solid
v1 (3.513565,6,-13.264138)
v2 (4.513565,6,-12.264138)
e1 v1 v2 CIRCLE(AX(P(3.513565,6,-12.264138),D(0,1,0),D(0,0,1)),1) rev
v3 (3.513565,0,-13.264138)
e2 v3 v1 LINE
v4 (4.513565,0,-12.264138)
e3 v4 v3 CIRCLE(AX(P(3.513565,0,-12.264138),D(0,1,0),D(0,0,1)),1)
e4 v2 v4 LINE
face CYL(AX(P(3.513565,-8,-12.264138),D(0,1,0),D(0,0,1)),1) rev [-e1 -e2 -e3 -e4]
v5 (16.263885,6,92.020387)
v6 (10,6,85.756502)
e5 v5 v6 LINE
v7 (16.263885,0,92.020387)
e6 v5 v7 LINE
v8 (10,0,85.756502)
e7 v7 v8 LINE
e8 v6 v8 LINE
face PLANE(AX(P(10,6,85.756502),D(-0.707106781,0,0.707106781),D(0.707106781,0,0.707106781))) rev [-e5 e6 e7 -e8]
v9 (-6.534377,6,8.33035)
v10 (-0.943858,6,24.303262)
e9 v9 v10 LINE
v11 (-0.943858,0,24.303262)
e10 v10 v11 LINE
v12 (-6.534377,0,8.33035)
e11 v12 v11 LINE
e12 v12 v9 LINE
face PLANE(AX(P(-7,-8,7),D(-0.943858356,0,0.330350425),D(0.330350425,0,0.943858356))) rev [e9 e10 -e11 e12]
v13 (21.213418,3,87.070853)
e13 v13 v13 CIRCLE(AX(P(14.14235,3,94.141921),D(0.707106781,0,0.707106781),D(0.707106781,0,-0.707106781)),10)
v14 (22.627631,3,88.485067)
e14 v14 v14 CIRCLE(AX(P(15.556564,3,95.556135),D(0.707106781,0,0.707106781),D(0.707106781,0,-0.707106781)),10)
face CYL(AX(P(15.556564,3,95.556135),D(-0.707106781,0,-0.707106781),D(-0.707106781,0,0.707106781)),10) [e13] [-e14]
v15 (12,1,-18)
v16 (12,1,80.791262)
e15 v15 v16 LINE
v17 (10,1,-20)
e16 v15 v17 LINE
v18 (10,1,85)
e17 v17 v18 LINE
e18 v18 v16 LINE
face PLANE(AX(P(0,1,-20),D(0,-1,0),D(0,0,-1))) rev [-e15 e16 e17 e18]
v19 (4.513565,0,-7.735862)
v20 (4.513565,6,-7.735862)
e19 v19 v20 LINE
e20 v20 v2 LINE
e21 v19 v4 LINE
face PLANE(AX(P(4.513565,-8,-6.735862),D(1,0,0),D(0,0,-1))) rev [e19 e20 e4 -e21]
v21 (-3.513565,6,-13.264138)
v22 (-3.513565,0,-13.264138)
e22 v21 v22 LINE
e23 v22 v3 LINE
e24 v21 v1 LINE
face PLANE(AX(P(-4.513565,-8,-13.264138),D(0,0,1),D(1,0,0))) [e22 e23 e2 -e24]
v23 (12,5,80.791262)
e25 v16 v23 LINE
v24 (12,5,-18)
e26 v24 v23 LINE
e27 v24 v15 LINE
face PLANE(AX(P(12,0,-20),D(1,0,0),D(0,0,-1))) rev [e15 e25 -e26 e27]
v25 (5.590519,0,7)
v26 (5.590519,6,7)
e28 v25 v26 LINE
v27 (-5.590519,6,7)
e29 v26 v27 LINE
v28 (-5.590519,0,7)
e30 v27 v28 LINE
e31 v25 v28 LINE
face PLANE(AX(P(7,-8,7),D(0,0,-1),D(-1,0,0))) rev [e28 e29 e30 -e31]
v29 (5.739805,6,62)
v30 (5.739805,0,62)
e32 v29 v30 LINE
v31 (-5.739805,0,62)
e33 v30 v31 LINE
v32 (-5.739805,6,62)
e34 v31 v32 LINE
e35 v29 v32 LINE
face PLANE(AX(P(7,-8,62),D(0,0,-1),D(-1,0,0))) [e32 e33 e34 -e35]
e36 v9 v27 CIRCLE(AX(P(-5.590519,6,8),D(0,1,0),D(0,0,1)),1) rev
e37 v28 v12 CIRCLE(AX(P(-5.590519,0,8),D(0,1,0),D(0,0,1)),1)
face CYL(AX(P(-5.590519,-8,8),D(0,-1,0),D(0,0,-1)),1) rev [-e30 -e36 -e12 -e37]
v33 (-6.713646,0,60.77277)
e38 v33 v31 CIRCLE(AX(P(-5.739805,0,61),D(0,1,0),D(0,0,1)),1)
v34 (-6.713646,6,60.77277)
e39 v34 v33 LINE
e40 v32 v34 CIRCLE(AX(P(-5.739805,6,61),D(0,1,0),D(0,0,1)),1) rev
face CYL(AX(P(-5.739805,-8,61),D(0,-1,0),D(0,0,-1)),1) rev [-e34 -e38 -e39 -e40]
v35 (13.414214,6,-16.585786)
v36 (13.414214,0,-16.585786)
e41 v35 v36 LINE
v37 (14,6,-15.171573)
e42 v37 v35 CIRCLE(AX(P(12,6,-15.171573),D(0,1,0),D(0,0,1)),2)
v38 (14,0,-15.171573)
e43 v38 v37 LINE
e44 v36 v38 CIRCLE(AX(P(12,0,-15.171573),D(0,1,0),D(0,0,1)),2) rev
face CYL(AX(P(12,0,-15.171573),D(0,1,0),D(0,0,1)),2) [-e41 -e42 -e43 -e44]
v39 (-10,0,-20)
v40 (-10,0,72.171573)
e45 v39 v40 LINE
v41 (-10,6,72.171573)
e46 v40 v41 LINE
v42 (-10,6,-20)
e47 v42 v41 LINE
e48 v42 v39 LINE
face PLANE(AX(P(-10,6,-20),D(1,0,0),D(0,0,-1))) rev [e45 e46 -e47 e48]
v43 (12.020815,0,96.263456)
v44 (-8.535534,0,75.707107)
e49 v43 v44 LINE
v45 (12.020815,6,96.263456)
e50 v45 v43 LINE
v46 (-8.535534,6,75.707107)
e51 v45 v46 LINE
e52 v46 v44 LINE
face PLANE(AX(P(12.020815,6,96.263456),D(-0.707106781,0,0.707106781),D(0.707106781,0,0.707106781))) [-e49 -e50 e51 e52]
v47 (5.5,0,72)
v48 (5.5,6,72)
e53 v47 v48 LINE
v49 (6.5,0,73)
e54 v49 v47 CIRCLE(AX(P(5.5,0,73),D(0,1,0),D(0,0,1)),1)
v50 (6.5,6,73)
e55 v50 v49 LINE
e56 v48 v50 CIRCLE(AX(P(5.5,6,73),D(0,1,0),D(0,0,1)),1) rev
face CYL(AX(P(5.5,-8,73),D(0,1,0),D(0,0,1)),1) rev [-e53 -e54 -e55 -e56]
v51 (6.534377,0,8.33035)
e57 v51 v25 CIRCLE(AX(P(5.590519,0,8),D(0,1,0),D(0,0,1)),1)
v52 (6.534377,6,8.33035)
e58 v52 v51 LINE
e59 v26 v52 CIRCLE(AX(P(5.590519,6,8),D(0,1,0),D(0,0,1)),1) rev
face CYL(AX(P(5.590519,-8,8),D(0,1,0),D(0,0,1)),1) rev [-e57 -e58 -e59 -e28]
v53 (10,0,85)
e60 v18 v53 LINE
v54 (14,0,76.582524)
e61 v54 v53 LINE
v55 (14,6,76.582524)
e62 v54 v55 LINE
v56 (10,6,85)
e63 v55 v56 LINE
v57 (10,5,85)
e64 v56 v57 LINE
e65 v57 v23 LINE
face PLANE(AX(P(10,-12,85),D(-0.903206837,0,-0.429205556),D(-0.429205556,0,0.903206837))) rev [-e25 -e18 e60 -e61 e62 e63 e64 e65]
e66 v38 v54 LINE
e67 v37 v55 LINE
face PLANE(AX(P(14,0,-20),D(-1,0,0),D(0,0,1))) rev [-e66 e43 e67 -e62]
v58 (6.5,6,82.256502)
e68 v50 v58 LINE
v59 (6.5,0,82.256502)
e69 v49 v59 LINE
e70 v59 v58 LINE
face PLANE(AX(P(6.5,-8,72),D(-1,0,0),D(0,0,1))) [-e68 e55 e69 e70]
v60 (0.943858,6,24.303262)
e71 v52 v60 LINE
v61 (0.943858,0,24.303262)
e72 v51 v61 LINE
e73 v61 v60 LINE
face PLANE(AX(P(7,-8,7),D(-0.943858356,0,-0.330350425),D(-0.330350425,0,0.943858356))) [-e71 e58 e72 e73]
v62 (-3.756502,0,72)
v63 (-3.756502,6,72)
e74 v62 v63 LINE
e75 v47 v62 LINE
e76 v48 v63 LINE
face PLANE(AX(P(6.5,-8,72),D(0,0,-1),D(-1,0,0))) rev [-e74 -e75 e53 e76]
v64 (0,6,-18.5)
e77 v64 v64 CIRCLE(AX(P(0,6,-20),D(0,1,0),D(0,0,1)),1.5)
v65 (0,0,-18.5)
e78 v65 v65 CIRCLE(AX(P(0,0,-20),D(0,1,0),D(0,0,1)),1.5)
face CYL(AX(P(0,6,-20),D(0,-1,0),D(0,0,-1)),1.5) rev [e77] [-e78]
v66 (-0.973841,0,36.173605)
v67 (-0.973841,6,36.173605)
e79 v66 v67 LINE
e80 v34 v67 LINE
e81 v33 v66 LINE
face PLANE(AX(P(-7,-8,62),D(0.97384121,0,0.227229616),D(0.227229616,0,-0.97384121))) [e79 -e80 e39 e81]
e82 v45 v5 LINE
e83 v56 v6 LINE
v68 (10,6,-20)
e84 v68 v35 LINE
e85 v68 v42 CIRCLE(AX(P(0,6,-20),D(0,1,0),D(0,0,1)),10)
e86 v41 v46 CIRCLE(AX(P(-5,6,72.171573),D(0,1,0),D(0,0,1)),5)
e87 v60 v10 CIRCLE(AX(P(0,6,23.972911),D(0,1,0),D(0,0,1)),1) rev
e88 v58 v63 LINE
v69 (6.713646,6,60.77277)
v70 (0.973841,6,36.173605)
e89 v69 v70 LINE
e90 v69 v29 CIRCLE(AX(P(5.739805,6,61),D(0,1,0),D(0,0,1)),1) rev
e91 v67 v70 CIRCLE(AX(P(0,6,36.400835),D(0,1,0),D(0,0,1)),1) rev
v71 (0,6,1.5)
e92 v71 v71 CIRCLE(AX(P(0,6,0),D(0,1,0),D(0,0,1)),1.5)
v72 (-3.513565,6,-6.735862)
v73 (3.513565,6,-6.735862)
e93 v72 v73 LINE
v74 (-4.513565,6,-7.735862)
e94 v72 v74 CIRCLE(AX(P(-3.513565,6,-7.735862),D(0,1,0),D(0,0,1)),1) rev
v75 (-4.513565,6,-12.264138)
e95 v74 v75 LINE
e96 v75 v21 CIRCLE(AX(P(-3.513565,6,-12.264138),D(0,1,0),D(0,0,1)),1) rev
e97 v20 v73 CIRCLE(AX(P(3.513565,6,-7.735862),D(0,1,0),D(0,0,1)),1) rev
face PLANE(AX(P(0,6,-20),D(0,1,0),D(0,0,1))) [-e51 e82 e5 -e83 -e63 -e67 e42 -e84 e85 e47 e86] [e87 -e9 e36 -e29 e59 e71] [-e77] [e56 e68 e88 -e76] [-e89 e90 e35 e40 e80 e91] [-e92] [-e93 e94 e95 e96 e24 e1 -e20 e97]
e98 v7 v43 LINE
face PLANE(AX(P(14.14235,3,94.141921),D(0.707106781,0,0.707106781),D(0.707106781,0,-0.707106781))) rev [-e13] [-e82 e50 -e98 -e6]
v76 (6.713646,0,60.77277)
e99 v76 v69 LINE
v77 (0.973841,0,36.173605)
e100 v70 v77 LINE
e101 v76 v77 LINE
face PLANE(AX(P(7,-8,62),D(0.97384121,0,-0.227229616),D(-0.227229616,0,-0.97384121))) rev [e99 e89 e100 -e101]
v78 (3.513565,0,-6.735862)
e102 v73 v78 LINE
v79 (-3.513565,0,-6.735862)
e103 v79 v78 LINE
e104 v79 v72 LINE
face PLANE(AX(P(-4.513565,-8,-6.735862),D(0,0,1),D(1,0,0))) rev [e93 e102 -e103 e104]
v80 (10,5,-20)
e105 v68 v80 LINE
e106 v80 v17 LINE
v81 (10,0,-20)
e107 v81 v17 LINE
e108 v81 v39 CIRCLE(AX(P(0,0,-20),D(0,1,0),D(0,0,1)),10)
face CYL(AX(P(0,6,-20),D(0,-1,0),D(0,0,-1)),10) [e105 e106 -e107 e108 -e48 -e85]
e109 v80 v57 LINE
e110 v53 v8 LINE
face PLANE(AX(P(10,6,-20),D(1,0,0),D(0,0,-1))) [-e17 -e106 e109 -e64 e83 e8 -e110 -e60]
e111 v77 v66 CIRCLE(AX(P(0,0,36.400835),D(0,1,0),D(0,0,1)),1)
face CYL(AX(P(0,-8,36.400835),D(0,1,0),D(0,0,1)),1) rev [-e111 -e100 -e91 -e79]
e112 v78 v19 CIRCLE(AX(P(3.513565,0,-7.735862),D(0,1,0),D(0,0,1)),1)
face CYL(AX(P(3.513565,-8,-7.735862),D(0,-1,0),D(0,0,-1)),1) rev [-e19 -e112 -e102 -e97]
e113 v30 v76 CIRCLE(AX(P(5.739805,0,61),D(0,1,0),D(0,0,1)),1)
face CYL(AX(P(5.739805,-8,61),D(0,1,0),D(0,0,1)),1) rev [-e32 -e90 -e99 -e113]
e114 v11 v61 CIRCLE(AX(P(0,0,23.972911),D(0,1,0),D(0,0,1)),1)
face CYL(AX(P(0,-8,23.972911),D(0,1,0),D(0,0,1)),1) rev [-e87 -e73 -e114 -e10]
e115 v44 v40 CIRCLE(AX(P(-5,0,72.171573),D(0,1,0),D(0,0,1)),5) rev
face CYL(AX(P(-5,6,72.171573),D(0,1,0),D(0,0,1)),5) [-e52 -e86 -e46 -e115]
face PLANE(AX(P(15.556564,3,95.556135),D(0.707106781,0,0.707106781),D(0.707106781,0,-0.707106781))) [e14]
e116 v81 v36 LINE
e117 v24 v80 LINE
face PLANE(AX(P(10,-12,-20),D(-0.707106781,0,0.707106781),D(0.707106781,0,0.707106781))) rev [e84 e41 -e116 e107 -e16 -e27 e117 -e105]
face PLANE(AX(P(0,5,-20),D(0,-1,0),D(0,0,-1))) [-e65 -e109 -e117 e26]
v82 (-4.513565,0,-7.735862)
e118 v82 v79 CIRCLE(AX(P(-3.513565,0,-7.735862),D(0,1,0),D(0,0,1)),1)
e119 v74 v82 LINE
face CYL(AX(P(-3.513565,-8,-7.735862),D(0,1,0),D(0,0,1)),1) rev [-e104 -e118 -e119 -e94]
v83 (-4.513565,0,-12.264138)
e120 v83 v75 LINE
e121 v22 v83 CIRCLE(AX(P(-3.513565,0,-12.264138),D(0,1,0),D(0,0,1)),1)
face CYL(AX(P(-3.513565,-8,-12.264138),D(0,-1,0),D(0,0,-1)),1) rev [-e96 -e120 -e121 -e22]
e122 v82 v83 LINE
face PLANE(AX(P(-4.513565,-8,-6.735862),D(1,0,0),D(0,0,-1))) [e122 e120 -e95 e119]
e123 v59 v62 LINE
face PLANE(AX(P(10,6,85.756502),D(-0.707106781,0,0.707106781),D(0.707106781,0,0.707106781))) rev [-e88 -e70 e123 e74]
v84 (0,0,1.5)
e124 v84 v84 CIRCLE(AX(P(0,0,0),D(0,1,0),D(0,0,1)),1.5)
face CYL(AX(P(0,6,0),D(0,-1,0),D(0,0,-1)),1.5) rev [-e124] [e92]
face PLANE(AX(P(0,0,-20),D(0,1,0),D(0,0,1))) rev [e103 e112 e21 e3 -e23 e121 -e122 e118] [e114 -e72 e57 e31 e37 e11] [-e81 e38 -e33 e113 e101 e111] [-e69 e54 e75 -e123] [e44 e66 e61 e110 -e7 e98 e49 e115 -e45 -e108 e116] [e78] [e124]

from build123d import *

# Parameters (mm, degrees)
SKETCH1_R               = 1.5
BOSS_EXTRUDE1_DEPTH     = 6
SKETCH3_W               = 13
SKETCH3_H               = 23
SKETCH3_W_2             = 9.027129354
SKETCH3_H_2             = 6.528275522
CUT_EXTRUDE1_DEPTH      = 14
FILLET1_R               = 1
BOSS_EXTRUDE4_DEPTH     = 120
SKETCH7_W               = 4
SKETCH7_H               = 6
CUT_EXTRUDE5_DEPTH      = 15
SKETCH8_R               = 10
BOSS_EXTRUDE5_DEPTH     = 2
CUT_EXTRUDE6_DEPTH      = 18
FILLET4_R               = 2
FILLET5_R               = 5
CUT_EXTRUDE8_DEPTH      = 20
CUT_EXTRUDE8_DEPTH_BACK = 20
CUT_EXTRUDE9_DEPTH      = 20
CUT_EXTRUDE9_DEPTH_BACK = 20
BOSS_EXTRUDE9_DEPTH     = 6
SKETCH16_R              = 10
BOSS_EXTRUDE10_DEPTH    = 2
FILLET6_R               = 5


with BuildPart() as part:
    # Sketch1 → Boss-Extrude1 (new body)
    with BuildSketch(Plane(origin=(0, 0, 0), x_dir=(1, 0, 0), z_dir=(0, 1, 0))):
        with BuildLine():
            Line((-10, 20), (-10, -100))
            Line((-10, -100), (10, -100))
            Line((10, -100), (10, 20))
            ThreePointArc((10, 20), (0, 30), (-10, 20))
        make_face()
        with Locations(Location((0, 0, 0), (0, 0, 270))):
            Circle(SKETCH1_R, mode=Mode.SUBTRACT)
        with Locations(Location((0, 20, 0), (0, 0, 270))):
            Circle(SKETCH1_R, mode=Mode.SUBTRACT)
    extrude(amount=BOSS_EXTRUDE1_DEPTH)

    # Sketch3 → Cut-Extrude1 (cut)
    with BuildSketch(Plane(origin=(0, 6, 0), x_dir=(1, 0, 0), z_dir=(0, 1, 0))):
        Polygon((7, -7), (-7, -7), (0, -27), align=None)
        Polygon((7, -62), (-7, -62), (0, -32), align=None)
        with Locations((0, -83.5)):
            Rectangle(SKETCH3_W, SKETCH3_H)
        with Locations((0, 10)):
            Rectangle(SKETCH3_W_2, SKETCH3_H_2)
    extrude(amount=-CUT_EXTRUDE1_DEPTH, mode=Mode.SUBTRACT)

    # Fillet1
    fillet1_edges = [part.edges().sort_by_distance(p)[0] for p in [
        (-6.5, 3, 95),
        (-6.5, 3, 72),
        (6.5, 3, 72),
        (6.5, 3, 95),
        (0, 3, 32),
        (7, 3, 62),
        (-7, 3, 62),
        (-7, 3, 7),
        (7, 3, 7),
        (0, 3, 27),
        (-4.513564677, 3, -13.264137761),
        (4.513564677, 3, -13.264137761),
        (4.513564677, 3, -6.735862239),
        (-4.513564677, 3, -6.735862239),
    ]]
    fillet(fillet1_edges, radius=FILLET1_R)

    # Sketch6 → Boss-Extrude4 (add)
    with BuildSketch(Plane.XY.offset(100)):
        Polygon((14, 6), (10, 6), (10, 5), (12, 5), (12, 1), (10, 1), (10, 0), (14, 0), align=None)
    extrude(amount=-BOSS_EXTRUDE4_DEPTH)

    # Sketch7 → Cut-Extrude5 (cut)
    with BuildSketch(Plane.XY.offset(100)):
        with Locations((12, 3)):
            Rectangle(SKETCH7_W, SKETCH7_H)
    extrude(amount=-CUT_EXTRUDE5_DEPTH, mode=Mode.SUBTRACT)

    # Sketch8 → Boss-Extrude5 (add)
    with BuildSketch(Plane.XY.offset(100)):
        with Locations((0, 3)):
            Circle(SKETCH8_R)
    extrude(amount=BOSS_EXTRUDE5_DEPTH)

    # Sketch9 → Cut-Extrude6 (cut)
    with BuildSketch(Plane(origin=(0, 6, 0), x_dir=(1, 0, 0), z_dir=(0, 1, 0))):
        Polygon((10, 20), (14, 16), (14, 20), align=None)
        Polygon((10, -85), (14, -76.582524272), (14, -85), align=None)
    extrude(amount=-CUT_EXTRUDE6_DEPTH, mode=Mode.SUBTRACT)

    # Fillet4
    fillet4_edges = [part.edges().sort_by_distance(p)[0] for p in [
        (14, 3, -16),
    ]]
    fillet(fillet4_edges, radius=FILLET4_R)

    # Fillet5
    # the kernel refuses this fillet: 5 mm, written as the material it adds along each edge
    with BuildSketch(Plane(origin=(22.039392014, 6, 100), x_dir=(0, 0, -1), z_dir=(-1, 0, 0))) as fillet5_piece_1_section:
        with BuildLine():
            CenterArc((FILLET5_R, -FILLET5_R), FILLET5_R, 90, 90)
            Line((0, -FILLET5_R), (0, 0))
            Line((0, 0), (FILLET5_R, 0))
        make_face()
    fillet5_piece_1 = extrude(amount=44.078784028, mode=Mode.PRIVATE)
    fillet5_piece_1 = fillet5_piece_1 & Plane(origin=(0, 3, 98.854598336), x_dir=(1, 0, 0), z_dir=(0, 0, -1)) * Cylinder(10, 109, mode=Mode.PRIVATE)
    add(fillet5_piece_1)
    with BuildSketch(Plane(origin=(22.039392014, 0, 100), x_dir=(0, 0, -1), z_dir=(-1, 0, 0))) as fillet5_piece_2_section:
        with BuildLine():
            CenterArc((FILLET5_R, FILLET5_R), FILLET5_R, 180, 90)
            Line((0, FILLET5_R), (0, 0))
            Line((0, 0), (FILLET5_R, 0))
        make_face()
    fillet5_piece_2 = extrude(amount=44.078784028, mode=Mode.PRIVATE)
    fillet5_piece_2 = fillet5_piece_2 & Plane(origin=(0, 3, 98.854598336), x_dir=(1, 0, 0), z_dir=(0, 0, -1)) * Cylinder(10, 109, mode=Mode.PRIVATE)
    add(fillet5_piece_2)

    # Sketch13 → Cut-Extrude8 (cut, two sides: drawn at the far end of the back side and taken through both)
    with BuildSketch(Plane.XZ.offset(-CUT_EXTRUDE8_DEPTH_BACK)):
        with BuildLine():
            Line((-6.5, 73.5), (0, 80))
            Line((0, 80), (6.5, 86.5))
            Line((6.5, 86.5), (6.5, 94))
            ThreePointArc((6.5, 94), (6.207106781, 94.707106781), (5.5, 95))
            Line((5.5, 95), (9.539392014, 95))
            Line((9.539392014, 95), (9.539392014, 100))
            Line((9.539392014, 100), (10, 100))
            Line((10, 100), (10, 90))
            Line((10, 90), (14.142135624, 94.142135624))
            Line((14.142135624, 94.142135624), (18.212490394, 115.492902619))
            Line((18.212490394, 115.492902619), (-15.568958515, 115.492902619))
            Line((-15.568958515, 115.492902619), (-15.568958515, 64.431041485))
            Line((-15.568958515, 64.431041485), (-10, 70))
            Line((-10, 70), (-10, 100))
            Line((-10, 100), (-9.539392014, 100))
            Line((-9.539392014, 100), (-9.539392014, 95))
            Line((-9.539392014, 95), (-5.5, 95))
            ThreePointArc((-5.5, 95), (-6.207106781, 94.707106781), (-6.5, 94))
            Line((-6.5, 94), (-6.5, 73.5))
        make_face()
    extrude(amount=CUT_EXTRUDE8_DEPTH + CUT_EXTRUDE8_DEPTH_BACK, mode=Mode.SUBTRACT)

    # Sketch14 → Cut-Extrude9 (cut, two sides: drawn at the far end of the back side and taken through both)
    with BuildSketch(Plane.XZ.offset(-CUT_EXTRUDE9_DEPTH_BACK)):
        Polygon((0, 80), (19.360707344, 99.360707344), (19.360707344, 111.570074628), (-16.85715032, 110.200384013), (-16.85715032, 63.14284968), align=None)
    extrude(amount=CUT_EXTRUDE9_DEPTH + CUT_EXTRUDE9_DEPTH_BACK, mode=Mode.SUBTRACT)

    # Sketch15 → Boss-Extrude9 (add)
    with BuildSketch(Plane.XZ):
        Polygon((14.142135624, 94.142135624), (16.263884736, 92.020386512), (10, 85.756501776), (-10, 65.756501776), (-10, 74.242640687), (12.02081528, 96.263455967), align=None)
    extrude(amount=-BOSS_EXTRUDE9_DEPTH)

    # Sketch16 → Boss-Extrude10 (add)
    with BuildSketch(Plane(origin=(54.142135624, 0, 54.142135624), x_dir=(0.7071067811865469, 0, -0.7071067811865481), z_dir=(0.7071067811865481, 0, 0.7071067811865469))):
        with Locations((-56.56823931, 3)):
            Circle(SKETCH16_R)
    extrude(amount=BOSS_EXTRUDE10_DEPTH)

    # Fillet6
    fillet6_edges = [part.edges().sort_by_distance(p)[0] for p in [
        (-10, 3, 74.242640687),
    ]]
    fillet(fillet6_edges, radius=FILLET6_R)


solid = part.part
